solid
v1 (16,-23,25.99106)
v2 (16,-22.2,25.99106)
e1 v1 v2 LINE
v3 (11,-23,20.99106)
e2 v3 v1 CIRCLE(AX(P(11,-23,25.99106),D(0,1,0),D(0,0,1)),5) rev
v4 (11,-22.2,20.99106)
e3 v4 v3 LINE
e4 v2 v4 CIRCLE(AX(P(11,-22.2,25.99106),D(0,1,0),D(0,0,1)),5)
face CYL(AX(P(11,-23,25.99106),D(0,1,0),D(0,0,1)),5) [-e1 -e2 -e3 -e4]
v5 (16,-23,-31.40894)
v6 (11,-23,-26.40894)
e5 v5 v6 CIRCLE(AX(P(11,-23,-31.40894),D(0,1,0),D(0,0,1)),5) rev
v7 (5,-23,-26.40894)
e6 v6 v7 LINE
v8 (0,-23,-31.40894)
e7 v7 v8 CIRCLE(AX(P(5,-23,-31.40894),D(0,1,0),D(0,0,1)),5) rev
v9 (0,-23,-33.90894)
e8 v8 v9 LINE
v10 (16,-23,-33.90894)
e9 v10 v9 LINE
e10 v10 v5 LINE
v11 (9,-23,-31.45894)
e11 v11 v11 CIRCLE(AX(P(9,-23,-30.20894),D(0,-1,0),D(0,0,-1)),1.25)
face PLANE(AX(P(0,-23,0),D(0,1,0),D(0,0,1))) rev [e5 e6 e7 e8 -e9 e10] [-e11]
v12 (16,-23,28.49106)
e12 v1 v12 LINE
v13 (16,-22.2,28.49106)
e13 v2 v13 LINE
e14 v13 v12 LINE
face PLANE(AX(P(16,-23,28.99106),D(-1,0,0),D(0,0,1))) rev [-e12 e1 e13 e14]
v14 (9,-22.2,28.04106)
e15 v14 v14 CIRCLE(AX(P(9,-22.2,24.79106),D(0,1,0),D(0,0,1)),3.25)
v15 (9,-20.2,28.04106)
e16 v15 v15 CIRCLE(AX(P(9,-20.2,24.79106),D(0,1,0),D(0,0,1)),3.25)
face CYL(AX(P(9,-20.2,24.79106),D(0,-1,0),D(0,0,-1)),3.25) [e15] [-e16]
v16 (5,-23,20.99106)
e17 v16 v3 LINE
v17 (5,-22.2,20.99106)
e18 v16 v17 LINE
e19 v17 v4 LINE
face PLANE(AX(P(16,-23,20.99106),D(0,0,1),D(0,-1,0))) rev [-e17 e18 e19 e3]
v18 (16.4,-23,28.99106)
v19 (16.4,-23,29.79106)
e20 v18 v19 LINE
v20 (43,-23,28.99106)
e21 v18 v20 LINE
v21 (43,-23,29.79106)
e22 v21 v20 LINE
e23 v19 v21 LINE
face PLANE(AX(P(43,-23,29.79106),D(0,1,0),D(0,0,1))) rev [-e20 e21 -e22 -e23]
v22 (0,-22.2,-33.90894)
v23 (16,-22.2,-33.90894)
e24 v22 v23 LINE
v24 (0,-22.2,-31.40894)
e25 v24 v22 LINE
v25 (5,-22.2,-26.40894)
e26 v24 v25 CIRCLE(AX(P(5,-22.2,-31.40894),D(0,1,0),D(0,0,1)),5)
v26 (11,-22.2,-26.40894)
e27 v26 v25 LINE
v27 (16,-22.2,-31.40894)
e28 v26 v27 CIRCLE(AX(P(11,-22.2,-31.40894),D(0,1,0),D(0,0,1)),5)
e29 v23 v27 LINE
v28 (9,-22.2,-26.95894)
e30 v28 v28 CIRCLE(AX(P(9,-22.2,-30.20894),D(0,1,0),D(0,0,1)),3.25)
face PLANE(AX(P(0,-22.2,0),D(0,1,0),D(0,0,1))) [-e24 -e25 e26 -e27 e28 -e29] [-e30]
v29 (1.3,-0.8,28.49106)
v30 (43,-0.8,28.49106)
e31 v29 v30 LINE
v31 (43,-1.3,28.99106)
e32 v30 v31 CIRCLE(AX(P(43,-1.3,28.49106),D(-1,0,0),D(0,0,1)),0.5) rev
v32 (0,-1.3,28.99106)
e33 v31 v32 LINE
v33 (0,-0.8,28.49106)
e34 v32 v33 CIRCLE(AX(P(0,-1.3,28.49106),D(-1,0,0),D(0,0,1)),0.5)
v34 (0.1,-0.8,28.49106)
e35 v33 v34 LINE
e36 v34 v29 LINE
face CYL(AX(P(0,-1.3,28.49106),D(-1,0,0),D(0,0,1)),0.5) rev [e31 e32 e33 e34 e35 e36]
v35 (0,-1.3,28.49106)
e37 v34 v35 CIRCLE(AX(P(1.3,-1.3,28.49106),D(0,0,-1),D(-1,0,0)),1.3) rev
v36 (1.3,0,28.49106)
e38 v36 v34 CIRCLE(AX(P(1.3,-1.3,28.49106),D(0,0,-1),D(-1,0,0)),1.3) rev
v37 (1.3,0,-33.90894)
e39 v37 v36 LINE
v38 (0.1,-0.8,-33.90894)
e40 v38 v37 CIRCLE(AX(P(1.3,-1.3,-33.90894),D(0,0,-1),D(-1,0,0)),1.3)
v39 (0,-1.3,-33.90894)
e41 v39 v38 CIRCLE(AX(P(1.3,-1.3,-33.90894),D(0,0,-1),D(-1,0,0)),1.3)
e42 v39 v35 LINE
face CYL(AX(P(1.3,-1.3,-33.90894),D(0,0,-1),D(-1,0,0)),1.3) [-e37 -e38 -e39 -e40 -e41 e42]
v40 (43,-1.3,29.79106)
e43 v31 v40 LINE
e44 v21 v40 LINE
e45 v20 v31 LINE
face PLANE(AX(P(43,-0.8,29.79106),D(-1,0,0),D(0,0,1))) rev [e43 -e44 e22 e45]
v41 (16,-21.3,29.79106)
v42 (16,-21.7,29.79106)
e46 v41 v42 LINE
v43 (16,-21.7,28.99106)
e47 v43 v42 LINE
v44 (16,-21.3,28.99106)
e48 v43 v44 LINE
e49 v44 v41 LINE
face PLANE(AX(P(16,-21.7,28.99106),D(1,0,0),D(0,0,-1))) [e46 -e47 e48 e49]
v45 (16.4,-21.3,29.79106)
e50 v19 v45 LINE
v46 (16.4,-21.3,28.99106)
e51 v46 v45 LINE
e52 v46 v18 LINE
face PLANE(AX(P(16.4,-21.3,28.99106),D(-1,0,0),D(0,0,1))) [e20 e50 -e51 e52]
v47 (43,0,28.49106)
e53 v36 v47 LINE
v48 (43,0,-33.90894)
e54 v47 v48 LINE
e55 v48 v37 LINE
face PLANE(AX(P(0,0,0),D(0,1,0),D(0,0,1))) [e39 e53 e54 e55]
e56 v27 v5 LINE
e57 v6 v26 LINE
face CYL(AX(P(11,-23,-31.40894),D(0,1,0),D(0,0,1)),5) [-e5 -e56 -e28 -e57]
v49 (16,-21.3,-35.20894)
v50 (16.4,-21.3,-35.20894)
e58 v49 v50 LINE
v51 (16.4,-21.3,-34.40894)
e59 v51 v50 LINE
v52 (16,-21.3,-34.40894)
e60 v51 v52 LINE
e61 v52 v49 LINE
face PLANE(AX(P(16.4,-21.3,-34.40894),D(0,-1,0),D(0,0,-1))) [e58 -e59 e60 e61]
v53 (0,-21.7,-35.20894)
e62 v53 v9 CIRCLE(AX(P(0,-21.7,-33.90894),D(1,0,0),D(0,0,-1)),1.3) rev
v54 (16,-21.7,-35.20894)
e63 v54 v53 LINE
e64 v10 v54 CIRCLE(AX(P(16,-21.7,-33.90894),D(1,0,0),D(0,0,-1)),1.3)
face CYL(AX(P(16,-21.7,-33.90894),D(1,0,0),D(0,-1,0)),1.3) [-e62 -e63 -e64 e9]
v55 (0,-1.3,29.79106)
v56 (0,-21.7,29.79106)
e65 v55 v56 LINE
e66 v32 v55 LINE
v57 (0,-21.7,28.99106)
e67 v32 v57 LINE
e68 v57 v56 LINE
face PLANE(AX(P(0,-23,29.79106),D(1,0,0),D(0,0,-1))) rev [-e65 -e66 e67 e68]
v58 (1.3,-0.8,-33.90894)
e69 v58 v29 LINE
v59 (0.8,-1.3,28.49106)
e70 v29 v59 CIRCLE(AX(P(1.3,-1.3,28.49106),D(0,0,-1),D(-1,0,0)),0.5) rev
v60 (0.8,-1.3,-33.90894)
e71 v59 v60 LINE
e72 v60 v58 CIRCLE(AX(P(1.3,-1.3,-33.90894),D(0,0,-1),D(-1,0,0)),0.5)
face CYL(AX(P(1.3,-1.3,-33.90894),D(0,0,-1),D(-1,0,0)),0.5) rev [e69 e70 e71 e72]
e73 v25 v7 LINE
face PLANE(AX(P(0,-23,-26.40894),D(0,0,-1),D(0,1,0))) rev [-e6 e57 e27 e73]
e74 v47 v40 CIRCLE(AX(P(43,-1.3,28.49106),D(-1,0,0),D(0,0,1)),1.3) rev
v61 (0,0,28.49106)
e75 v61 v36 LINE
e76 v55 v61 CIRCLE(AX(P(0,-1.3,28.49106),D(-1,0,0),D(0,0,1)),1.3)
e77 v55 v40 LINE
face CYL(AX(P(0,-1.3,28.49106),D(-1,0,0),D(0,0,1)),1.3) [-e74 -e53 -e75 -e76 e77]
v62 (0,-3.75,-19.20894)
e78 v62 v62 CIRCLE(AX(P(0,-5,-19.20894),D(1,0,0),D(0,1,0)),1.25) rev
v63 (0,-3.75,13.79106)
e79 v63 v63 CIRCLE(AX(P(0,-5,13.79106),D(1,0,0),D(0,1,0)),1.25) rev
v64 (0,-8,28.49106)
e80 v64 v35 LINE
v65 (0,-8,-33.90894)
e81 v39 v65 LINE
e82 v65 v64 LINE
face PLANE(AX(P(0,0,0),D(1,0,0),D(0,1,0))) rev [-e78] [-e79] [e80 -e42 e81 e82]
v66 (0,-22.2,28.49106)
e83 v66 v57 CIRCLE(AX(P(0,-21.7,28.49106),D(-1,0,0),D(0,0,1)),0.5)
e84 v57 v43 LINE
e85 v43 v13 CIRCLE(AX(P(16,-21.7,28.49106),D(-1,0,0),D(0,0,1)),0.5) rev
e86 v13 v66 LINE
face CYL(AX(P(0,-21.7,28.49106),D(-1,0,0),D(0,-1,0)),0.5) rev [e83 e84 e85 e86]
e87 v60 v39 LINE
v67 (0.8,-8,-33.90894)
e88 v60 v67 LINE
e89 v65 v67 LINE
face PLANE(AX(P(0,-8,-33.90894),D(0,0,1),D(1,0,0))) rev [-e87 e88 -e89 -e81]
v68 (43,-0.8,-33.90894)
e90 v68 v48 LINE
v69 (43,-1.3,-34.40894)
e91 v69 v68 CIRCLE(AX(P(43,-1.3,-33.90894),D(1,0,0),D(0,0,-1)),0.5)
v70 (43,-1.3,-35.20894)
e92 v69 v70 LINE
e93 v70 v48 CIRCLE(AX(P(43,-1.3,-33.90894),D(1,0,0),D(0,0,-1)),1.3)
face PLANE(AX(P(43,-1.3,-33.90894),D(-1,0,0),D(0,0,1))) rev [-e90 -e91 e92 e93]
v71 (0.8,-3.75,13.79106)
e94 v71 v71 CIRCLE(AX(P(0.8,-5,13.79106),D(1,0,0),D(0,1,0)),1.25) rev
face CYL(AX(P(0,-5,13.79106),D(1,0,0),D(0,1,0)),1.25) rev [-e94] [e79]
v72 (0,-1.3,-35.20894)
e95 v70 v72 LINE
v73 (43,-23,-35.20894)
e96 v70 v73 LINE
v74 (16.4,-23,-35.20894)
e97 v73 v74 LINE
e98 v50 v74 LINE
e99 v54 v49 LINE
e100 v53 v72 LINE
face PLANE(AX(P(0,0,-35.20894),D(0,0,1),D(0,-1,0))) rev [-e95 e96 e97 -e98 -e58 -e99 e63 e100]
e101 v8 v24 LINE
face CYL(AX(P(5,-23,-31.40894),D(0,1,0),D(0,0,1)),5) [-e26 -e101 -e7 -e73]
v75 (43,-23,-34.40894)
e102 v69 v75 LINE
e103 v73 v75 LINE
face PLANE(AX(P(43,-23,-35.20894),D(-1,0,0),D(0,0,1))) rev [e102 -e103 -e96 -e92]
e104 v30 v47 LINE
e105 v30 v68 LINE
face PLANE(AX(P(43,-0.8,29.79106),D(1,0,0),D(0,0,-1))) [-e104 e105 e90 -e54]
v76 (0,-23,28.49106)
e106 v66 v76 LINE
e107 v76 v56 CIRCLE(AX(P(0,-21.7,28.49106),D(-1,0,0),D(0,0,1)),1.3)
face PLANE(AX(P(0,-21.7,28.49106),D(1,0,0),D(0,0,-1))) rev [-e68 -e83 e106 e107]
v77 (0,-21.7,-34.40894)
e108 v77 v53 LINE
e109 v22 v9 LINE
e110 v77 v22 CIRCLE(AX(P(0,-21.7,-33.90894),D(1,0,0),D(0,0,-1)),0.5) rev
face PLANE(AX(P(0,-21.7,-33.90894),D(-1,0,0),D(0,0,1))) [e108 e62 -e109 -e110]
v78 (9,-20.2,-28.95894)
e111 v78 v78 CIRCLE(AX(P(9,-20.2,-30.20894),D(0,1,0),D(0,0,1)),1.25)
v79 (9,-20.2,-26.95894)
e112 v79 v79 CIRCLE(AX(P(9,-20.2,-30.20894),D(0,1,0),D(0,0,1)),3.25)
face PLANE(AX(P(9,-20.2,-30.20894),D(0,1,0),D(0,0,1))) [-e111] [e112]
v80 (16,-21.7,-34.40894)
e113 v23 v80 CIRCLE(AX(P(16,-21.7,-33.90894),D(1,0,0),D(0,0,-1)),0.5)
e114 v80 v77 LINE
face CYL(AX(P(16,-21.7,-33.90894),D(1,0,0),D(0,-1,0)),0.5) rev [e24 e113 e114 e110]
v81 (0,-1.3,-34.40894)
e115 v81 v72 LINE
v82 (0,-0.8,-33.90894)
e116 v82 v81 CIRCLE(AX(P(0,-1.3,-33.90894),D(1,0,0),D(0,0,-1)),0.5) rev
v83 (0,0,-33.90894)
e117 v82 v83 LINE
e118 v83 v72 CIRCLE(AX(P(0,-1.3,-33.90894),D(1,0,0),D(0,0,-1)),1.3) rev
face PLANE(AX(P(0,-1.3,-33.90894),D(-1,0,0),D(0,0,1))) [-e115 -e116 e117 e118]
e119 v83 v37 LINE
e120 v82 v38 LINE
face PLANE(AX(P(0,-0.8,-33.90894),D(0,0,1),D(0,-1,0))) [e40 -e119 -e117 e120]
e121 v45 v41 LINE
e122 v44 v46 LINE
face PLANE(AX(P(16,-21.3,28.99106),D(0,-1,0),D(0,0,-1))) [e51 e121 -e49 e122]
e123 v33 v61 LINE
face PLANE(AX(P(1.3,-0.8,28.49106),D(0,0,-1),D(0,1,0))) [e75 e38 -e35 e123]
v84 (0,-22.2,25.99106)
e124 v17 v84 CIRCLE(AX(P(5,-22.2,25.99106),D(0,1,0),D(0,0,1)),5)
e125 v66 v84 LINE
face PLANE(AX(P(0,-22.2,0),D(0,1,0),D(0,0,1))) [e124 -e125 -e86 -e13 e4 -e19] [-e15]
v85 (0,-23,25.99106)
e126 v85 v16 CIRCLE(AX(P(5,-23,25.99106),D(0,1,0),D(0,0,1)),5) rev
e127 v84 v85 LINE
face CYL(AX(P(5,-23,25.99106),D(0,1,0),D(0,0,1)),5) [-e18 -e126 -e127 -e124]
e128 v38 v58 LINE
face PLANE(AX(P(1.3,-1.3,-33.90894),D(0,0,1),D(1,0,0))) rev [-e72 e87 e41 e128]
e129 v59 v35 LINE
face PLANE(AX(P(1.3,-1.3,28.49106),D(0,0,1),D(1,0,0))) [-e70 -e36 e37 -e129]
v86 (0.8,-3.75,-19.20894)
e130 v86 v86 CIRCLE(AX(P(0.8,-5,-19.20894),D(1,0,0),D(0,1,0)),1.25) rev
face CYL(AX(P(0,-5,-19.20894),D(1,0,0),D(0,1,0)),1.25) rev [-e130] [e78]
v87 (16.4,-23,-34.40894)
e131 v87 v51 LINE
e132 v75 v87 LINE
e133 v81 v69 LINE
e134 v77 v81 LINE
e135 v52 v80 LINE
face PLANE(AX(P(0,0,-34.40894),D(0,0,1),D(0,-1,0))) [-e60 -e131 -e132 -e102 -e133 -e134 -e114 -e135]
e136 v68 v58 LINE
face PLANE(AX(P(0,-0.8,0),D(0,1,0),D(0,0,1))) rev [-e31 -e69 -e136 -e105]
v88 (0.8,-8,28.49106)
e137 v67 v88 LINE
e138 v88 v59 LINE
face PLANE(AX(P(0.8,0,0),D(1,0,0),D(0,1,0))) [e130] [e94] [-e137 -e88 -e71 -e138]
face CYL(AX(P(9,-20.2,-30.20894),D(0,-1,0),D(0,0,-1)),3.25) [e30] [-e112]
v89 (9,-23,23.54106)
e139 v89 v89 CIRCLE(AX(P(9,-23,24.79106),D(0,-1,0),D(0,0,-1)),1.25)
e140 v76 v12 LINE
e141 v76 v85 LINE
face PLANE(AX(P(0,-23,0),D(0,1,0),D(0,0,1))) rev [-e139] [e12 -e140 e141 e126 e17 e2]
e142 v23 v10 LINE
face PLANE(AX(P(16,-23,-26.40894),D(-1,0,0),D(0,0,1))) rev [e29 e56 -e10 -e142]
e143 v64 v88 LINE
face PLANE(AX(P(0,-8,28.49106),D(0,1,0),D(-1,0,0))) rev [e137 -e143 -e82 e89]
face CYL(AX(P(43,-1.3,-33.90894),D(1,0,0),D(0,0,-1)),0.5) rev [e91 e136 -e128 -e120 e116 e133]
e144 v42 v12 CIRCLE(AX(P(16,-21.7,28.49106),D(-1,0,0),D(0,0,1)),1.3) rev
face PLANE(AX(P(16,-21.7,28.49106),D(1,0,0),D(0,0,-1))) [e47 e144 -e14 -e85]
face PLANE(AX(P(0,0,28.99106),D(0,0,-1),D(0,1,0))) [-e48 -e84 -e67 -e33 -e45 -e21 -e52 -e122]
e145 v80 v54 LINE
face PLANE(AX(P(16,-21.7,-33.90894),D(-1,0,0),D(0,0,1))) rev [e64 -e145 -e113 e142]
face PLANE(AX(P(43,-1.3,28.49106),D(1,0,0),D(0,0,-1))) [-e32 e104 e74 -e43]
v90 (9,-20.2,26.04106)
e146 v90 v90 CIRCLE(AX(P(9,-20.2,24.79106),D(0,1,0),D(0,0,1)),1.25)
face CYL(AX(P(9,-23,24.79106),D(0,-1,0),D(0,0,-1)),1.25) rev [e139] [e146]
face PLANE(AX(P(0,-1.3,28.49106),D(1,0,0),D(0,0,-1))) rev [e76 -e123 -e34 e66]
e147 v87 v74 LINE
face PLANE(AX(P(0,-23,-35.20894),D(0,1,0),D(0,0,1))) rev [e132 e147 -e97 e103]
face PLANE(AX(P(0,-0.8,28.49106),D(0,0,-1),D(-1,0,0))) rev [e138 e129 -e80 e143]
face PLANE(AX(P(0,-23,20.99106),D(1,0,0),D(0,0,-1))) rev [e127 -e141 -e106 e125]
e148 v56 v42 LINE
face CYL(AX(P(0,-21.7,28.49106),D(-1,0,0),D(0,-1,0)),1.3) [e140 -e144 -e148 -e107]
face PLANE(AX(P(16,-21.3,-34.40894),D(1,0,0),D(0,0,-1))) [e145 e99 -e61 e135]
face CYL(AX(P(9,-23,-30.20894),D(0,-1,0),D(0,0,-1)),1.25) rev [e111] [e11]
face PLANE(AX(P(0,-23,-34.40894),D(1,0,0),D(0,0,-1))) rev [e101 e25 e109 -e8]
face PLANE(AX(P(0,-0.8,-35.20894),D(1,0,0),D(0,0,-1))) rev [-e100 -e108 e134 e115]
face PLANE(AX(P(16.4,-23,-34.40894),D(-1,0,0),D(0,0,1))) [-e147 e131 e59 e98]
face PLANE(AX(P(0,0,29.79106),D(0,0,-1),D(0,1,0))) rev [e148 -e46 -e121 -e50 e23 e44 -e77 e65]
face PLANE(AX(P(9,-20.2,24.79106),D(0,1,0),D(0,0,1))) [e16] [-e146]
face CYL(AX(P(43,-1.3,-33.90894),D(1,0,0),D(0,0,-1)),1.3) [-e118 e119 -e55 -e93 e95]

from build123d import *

# Parameters (mm, degrees)
SKETCH_1_W                          = 43
SKETCH_1_H                          = 65
SM_BASE_FLANGE_1_DEPTH              = 0.8
SM_EDGE_FLANGE_1_STRIP_W            = 4.2
SM_EDGE_FLANGE_1_STRIP_H            = 0.8
SM_EDGE_FLANGE_1_STRIP_CUT_DEPTH    = 43
SM_EDGE_FLANGE_1_STRIP_2_W          = 4.2
SM_EDGE_FLANGE_1_STRIP_2_H          = 0.8
SM_EDGE_FLANGE_1_STRIP_CUT_2_DEPTH  = 43
SM_EDGE_FLANGE_1_DEPTH              = 43
SM_EDGE_FLANGE_1_BEND_DEPTH         = 43
SM_EDGE_FLANGE_2_STRIP_W            = 4.2
SM_EDGE_FLANGE_2_STRIP_H            = 0.8
SM_EDGE_FLANGE_2_STRIP_CUT_DEPTH    = 62.4
SM_EDGE_FLANGE_2_DEPTH              = 62.4
SM_EDGE_FLANGE_2_PROFILE_W          = 62.4
SM_EDGE_FLANGE_2_PROFILE_H          = 6.7
SM_EDGE_FLANGE_2_PROFILE_R          = 1.25
SM_EDGE_FLANGE_2_FLAT_DEPTH         = 0.8
SM_EDGE_FLANGE_3_STRIP_W            = 4.2
SM_EDGE_FLANGE_3_STRIP_H            = 0.8
SM_EDGE_FLANGE_3_STRIP_CUT_DEPTH    = 16
SM_EDGE_FLANGE_3_RELIEF_W           = 4.6
SM_EDGE_FLANGE_3_RELIEF_H           = 0.4
SM_EDGE_FLANGE_3_RELIEF_CUT_DEPTH   = 0.8
SM_EDGE_FLANGE_3_STRIP_2_W          = 4.2
SM_EDGE_FLANGE_3_STRIP_2_H          = 0.8
SM_EDGE_FLANGE_3_STRIP_CUT_2_DEPTH  = 16
SM_EDGE_FLANGE_3_RELIEF_2_W         = 4.6
SM_EDGE_FLANGE_3_RELIEF_2_H         = 0.4
SM_EDGE_FLANGE_3_RELIEF_CUT_2_DEPTH = 0.8
SM_EDGE_FLANGE_3_DEPTH              = 16
SM_EDGE_FLANGE_3_BEND_DEPTH         = 16
SKETCH_25_R                         = 3.25
EXTRUDE_1_DEPTH                     = 2
HOLE_WIZARD_M3_1_D                  = 2.5
HOLE_WIZARD_M3_1_DEPTH              = 2.8
FILLET_3_R                          = 5


# Sheet-metal steps are written as plain solids
with BuildPart() as part:
    # Sketch 1 → 基体-法兰1 (new body)
    with BuildSketch(Plane(origin=(0, 0, 0), x_dir=(1, 0, 0), z_dir=(0, 1, 0))):
        with Locations((21.5, 2.708940216)):
            Rectangle(SKETCH_1_W, SKETCH_1_H)
    extrude(amount=-SM_BASE_FLANGE_1_DEPTH)

    # 边线-法兰1 strip (across the edge) → 边线-法兰1 strip cut (cut)
    with BuildSketch(Plane(origin=(0, -0.8, -35.208940216), x_dir=(0, 0, 1), z_dir=(1, 0, 0))):
        with Locations((-0.8, -0.4)):
            Rectangle(SM_EDGE_FLANGE_1_STRIP_W, SM_EDGE_FLANGE_1_STRIP_H)
    extrude(amount=SM_EDGE_FLANGE_1_STRIP_CUT_DEPTH, mode=Mode.SUBTRACT)

    # 边线-法兰1 strip 2 (across the edge) → 边线-法兰1 strip cut 2 (cut)
    with BuildSketch(Plane(origin=(43, -0.8, 29.791059784), x_dir=(0, 0, -1), z_dir=(-1, 0, 0))):
        with Locations((-0.8, -0.4)):
            Rectangle(SM_EDGE_FLANGE_1_STRIP_2_W, SM_EDGE_FLANGE_1_STRIP_2_H)
    extrude(amount=SM_EDGE_FLANGE_1_STRIP_CUT_2_DEPTH, mode=Mode.SUBTRACT)

    # 边线-法兰1 section (across the edge) → 边线-法兰1 (add)
    with BuildSketch(Plane(origin=(0, -0.8, -35.208940216), x_dir=(0, 0, 1), z_dir=(1, 0, 0))):
        with BuildLine():
            Line((0, 0.5), (0, 22.2))
            Line((0, 22.2), (0.8, 22.2))
            Line((0.8, 22.2), (0.8, 0.5))
            ThreePointArc((0.8, 0.5), (0.946446609, 0.146446609), (1.3, 0))
            Line((1.3, 0), (1.3, -0.8))
            ThreePointArc((1.3, -0.8), (0.380761184, -0.419238816), (0, 0.5))
        make_face()
    extrude(amount=SM_EDGE_FLANGE_1_DEPTH)

    # 边线-法兰1 section 2 (across the edge) → 边线-法兰1 bend (add)
    with BuildSketch(Plane(origin=(43, -0.8, 29.791059784), x_dir=(0, 0, -1), z_dir=(-1, 0, 0))):
        with BuildLine():
            Line((0, 0.5), (0, 22.2))
            Line((0, 22.2), (0.8, 22.2))
            Line((0.8, 22.2), (0.8, 0.5))
            ThreePointArc((0.8, 0.5), (0.946446609, 0.146446609), (1.3, 0))
            Line((1.3, 0), (1.3, -0.8))
            ThreePointArc((1.3, -0.8), (0.380761184, -0.419238816), (0, 0.5))
        make_face()
    extrude(amount=SM_EDGE_FLANGE_1_BEND_DEPTH)

    # 边线-法兰2 strip (across the edge) → 边线-法兰2 strip cut (cut)
    with BuildSketch(Plane(origin=(0, -0.8, 28.491059784), x_dir=(1, 0, 0), z_dir=(0, 0, -1))):
        with Locations((-0.8, -0.4)):
            Rectangle(SM_EDGE_FLANGE_2_STRIP_W, SM_EDGE_FLANGE_2_STRIP_H)
    extrude(amount=SM_EDGE_FLANGE_2_STRIP_CUT_DEPTH, mode=Mode.SUBTRACT)

    # 边线-法兰2 bend section (across the edge) → 边线-法兰2 (add)
    with BuildSketch(Plane(origin=(0, -0.8, 28.491059784), x_dir=(1, 0, 0), z_dir=(0, 0, -1))):
        with BuildLine():
            Line((0, 0.5), (0.8, 0.5))
            ThreePointArc((0.8, 0.5), (0.946446609, 0.146446609), (1.3, 0))
            Line((1.3, 0), (1.3, -0.8))
            ThreePointArc((1.3, -0.8), (0.380761184, -0.419238816), (0, 0.5))
        make_face()
    extrude(amount=SM_EDGE_FLANGE_2_DEPTH)

    # 边线-法兰2 profile (on flange) → 边线-法兰2 flat (add)
    with BuildSketch(Plane(origin=(0, -0.8, 0), x_dir=(0, 0, -1), z_dir=(-1, 0, 0))):
        with Locations((2.708940216, 3.85)):
            Rectangle(SM_EDGE_FLANGE_2_PROFILE_W, SM_EDGE_FLANGE_2_PROFILE_H)
        with Locations((19.208940216, 4.2)):
            Circle(SM_EDGE_FLANGE_2_PROFILE_R, mode=Mode.SUBTRACT)
        with Locations((-13.791059784, 4.2)):
            Circle(SM_EDGE_FLANGE_2_PROFILE_R, mode=Mode.SUBTRACT)
    extrude(amount=-SM_EDGE_FLANGE_2_FLAT_DEPTH)

    # 边线-法兰3 strip (across the edge) → 边线-法兰3 strip cut (cut)
    with BuildSketch(Plane(origin=(0, -23, -34.408940216), x_dir=(0, 1, 0), z_dir=(1, 0, 0))):
        with Locations((-0.8, -0.4)):
            Rectangle(SM_EDGE_FLANGE_3_STRIP_W, SM_EDGE_FLANGE_3_STRIP_H)
    extrude(amount=SM_EDGE_FLANGE_3_STRIP_CUT_DEPTH, mode=Mode.SUBTRACT)

    # 边线-法兰3 relief (on the sheet) → 边线-法兰3 relief cut (cut)
    with BuildSketch(Plane(origin=(0, -21.7, -34.408940216), x_dir=(0, 1, 0), z_dir=(0, 0, 1))):
        with Locations((-1.9, -16.2)):
            Rectangle(SM_EDGE_FLANGE_3_RELIEF_W, SM_EDGE_FLANGE_3_RELIEF_H)
    extrude(amount=-SM_EDGE_FLANGE_3_RELIEF_CUT_DEPTH, mode=Mode.SUBTRACT)

    # 边线-法兰3 strip 2 (across the edge) → 边线-法兰3 strip cut 2 (cut)
    with BuildSketch(Plane(origin=(16, -23, 28.991059784), x_dir=(0, 1, 0), z_dir=(-1, 0, 0))):
        with Locations((-0.8, -0.4)):
            Rectangle(SM_EDGE_FLANGE_3_STRIP_2_W, SM_EDGE_FLANGE_3_STRIP_2_H)
    extrude(amount=SM_EDGE_FLANGE_3_STRIP_CUT_2_DEPTH, mode=Mode.SUBTRACT)

    # 边线-法兰3 relief 2 (on the sheet) → 边线-法兰3 relief cut 2 (cut)
    with BuildSketch(Plane(origin=(16, -21.7, 28.991059784), x_dir=(0, 1, 0), z_dir=(0, 0, -1))):
        with Locations((-1.9, 0.2)):
            Rectangle(SM_EDGE_FLANGE_3_RELIEF_2_W, SM_EDGE_FLANGE_3_RELIEF_2_H)
    extrude(amount=-SM_EDGE_FLANGE_3_RELIEF_CUT_2_DEPTH, mode=Mode.SUBTRACT)

    # 边线-法兰3 section (across the edge) → 边线-法兰3 (add)
    with BuildSketch(Plane(origin=(0, -23, -34.408940216), x_dir=(0, 1, 0), z_dir=(1, 0, 0))):
        with BuildLine():
            Line((0, 0.5), (0, 8))
            Line((0, 8), (0.8, 8))
            Line((0.8, 8), (0.8, 0.5))
            ThreePointArc((0.8, 0.5), (0.946446609, 0.146446609), (1.3, 0))
            Line((1.3, 0), (1.3, -0.8))
            ThreePointArc((1.3, -0.8), (0.380761184, -0.419238816), (0, 0.5))
        make_face()
    extrude(amount=SM_EDGE_FLANGE_3_DEPTH)

    # 边线-法兰3 section 2 (across the edge) → 边线-法兰3 bend (add)
    with BuildSketch(Plane(origin=(16, -23, 28.991059784), x_dir=(0, 1, 0), z_dir=(-1, 0, 0))):
        with BuildLine():
            Line((0, 0.5), (0, 8))
            Line((0, 8), (0.8, 8))
            Line((0.8, 8), (0.8, 0.5))
            ThreePointArc((0.8, 0.5), (0.946446609, 0.146446609), (1.3, 0))
            Line((1.3, 0), (1.3, -0.8))
            ThreePointArc((1.3, -0.8), (0.380761184, -0.419238816), (0, 0.5))
        make_face()
    extrude(amount=SM_EDGE_FLANGE_3_BEND_DEPTH)

    # 草图25 → 凸台-拉伸1 (add)
    with BuildSketch(Plane(origin=(0, -22.2, 0), x_dir=(1, 0, 0), z_dir=(0, 1, 0))):
        with Locations(Location((9, -24.791059784, 0), (0, 0, 270))):
            Circle(SKETCH_25_R)
        with Locations(Location((9, 30.208940216, 0), (0, 0, 270))):
            Circle(SKETCH_25_R)
    extrude(amount=EXTRUDE_1_DEPTH)

    # M3 螺纹孔1
    with Locations(Plane(origin=(0, -23, 0), x_dir=(-1, 0, 0), z_dir=(0, -1, 0))):
        with Locations((-9, -24.791059784), (-9, 30.208940216)):
            Hole(HOLE_WIZARD_M3_1_D / 2, depth=HOLE_WIZARD_M3_1_DEPTH)

    # 圆角3
    fillet_3_edges = [part.edges().sort_by_distance(p)[0] for p in [
        (0, -22.6, -26.408940216),
        (16, -22.6, -26.408940216),
        (16, -22.6, 20.991059784),
        (0, -22.6, 20.991059784),
    ]]
    fillet(fillet_3_edges, radius=FILLET_3_R)


solid = part.part
